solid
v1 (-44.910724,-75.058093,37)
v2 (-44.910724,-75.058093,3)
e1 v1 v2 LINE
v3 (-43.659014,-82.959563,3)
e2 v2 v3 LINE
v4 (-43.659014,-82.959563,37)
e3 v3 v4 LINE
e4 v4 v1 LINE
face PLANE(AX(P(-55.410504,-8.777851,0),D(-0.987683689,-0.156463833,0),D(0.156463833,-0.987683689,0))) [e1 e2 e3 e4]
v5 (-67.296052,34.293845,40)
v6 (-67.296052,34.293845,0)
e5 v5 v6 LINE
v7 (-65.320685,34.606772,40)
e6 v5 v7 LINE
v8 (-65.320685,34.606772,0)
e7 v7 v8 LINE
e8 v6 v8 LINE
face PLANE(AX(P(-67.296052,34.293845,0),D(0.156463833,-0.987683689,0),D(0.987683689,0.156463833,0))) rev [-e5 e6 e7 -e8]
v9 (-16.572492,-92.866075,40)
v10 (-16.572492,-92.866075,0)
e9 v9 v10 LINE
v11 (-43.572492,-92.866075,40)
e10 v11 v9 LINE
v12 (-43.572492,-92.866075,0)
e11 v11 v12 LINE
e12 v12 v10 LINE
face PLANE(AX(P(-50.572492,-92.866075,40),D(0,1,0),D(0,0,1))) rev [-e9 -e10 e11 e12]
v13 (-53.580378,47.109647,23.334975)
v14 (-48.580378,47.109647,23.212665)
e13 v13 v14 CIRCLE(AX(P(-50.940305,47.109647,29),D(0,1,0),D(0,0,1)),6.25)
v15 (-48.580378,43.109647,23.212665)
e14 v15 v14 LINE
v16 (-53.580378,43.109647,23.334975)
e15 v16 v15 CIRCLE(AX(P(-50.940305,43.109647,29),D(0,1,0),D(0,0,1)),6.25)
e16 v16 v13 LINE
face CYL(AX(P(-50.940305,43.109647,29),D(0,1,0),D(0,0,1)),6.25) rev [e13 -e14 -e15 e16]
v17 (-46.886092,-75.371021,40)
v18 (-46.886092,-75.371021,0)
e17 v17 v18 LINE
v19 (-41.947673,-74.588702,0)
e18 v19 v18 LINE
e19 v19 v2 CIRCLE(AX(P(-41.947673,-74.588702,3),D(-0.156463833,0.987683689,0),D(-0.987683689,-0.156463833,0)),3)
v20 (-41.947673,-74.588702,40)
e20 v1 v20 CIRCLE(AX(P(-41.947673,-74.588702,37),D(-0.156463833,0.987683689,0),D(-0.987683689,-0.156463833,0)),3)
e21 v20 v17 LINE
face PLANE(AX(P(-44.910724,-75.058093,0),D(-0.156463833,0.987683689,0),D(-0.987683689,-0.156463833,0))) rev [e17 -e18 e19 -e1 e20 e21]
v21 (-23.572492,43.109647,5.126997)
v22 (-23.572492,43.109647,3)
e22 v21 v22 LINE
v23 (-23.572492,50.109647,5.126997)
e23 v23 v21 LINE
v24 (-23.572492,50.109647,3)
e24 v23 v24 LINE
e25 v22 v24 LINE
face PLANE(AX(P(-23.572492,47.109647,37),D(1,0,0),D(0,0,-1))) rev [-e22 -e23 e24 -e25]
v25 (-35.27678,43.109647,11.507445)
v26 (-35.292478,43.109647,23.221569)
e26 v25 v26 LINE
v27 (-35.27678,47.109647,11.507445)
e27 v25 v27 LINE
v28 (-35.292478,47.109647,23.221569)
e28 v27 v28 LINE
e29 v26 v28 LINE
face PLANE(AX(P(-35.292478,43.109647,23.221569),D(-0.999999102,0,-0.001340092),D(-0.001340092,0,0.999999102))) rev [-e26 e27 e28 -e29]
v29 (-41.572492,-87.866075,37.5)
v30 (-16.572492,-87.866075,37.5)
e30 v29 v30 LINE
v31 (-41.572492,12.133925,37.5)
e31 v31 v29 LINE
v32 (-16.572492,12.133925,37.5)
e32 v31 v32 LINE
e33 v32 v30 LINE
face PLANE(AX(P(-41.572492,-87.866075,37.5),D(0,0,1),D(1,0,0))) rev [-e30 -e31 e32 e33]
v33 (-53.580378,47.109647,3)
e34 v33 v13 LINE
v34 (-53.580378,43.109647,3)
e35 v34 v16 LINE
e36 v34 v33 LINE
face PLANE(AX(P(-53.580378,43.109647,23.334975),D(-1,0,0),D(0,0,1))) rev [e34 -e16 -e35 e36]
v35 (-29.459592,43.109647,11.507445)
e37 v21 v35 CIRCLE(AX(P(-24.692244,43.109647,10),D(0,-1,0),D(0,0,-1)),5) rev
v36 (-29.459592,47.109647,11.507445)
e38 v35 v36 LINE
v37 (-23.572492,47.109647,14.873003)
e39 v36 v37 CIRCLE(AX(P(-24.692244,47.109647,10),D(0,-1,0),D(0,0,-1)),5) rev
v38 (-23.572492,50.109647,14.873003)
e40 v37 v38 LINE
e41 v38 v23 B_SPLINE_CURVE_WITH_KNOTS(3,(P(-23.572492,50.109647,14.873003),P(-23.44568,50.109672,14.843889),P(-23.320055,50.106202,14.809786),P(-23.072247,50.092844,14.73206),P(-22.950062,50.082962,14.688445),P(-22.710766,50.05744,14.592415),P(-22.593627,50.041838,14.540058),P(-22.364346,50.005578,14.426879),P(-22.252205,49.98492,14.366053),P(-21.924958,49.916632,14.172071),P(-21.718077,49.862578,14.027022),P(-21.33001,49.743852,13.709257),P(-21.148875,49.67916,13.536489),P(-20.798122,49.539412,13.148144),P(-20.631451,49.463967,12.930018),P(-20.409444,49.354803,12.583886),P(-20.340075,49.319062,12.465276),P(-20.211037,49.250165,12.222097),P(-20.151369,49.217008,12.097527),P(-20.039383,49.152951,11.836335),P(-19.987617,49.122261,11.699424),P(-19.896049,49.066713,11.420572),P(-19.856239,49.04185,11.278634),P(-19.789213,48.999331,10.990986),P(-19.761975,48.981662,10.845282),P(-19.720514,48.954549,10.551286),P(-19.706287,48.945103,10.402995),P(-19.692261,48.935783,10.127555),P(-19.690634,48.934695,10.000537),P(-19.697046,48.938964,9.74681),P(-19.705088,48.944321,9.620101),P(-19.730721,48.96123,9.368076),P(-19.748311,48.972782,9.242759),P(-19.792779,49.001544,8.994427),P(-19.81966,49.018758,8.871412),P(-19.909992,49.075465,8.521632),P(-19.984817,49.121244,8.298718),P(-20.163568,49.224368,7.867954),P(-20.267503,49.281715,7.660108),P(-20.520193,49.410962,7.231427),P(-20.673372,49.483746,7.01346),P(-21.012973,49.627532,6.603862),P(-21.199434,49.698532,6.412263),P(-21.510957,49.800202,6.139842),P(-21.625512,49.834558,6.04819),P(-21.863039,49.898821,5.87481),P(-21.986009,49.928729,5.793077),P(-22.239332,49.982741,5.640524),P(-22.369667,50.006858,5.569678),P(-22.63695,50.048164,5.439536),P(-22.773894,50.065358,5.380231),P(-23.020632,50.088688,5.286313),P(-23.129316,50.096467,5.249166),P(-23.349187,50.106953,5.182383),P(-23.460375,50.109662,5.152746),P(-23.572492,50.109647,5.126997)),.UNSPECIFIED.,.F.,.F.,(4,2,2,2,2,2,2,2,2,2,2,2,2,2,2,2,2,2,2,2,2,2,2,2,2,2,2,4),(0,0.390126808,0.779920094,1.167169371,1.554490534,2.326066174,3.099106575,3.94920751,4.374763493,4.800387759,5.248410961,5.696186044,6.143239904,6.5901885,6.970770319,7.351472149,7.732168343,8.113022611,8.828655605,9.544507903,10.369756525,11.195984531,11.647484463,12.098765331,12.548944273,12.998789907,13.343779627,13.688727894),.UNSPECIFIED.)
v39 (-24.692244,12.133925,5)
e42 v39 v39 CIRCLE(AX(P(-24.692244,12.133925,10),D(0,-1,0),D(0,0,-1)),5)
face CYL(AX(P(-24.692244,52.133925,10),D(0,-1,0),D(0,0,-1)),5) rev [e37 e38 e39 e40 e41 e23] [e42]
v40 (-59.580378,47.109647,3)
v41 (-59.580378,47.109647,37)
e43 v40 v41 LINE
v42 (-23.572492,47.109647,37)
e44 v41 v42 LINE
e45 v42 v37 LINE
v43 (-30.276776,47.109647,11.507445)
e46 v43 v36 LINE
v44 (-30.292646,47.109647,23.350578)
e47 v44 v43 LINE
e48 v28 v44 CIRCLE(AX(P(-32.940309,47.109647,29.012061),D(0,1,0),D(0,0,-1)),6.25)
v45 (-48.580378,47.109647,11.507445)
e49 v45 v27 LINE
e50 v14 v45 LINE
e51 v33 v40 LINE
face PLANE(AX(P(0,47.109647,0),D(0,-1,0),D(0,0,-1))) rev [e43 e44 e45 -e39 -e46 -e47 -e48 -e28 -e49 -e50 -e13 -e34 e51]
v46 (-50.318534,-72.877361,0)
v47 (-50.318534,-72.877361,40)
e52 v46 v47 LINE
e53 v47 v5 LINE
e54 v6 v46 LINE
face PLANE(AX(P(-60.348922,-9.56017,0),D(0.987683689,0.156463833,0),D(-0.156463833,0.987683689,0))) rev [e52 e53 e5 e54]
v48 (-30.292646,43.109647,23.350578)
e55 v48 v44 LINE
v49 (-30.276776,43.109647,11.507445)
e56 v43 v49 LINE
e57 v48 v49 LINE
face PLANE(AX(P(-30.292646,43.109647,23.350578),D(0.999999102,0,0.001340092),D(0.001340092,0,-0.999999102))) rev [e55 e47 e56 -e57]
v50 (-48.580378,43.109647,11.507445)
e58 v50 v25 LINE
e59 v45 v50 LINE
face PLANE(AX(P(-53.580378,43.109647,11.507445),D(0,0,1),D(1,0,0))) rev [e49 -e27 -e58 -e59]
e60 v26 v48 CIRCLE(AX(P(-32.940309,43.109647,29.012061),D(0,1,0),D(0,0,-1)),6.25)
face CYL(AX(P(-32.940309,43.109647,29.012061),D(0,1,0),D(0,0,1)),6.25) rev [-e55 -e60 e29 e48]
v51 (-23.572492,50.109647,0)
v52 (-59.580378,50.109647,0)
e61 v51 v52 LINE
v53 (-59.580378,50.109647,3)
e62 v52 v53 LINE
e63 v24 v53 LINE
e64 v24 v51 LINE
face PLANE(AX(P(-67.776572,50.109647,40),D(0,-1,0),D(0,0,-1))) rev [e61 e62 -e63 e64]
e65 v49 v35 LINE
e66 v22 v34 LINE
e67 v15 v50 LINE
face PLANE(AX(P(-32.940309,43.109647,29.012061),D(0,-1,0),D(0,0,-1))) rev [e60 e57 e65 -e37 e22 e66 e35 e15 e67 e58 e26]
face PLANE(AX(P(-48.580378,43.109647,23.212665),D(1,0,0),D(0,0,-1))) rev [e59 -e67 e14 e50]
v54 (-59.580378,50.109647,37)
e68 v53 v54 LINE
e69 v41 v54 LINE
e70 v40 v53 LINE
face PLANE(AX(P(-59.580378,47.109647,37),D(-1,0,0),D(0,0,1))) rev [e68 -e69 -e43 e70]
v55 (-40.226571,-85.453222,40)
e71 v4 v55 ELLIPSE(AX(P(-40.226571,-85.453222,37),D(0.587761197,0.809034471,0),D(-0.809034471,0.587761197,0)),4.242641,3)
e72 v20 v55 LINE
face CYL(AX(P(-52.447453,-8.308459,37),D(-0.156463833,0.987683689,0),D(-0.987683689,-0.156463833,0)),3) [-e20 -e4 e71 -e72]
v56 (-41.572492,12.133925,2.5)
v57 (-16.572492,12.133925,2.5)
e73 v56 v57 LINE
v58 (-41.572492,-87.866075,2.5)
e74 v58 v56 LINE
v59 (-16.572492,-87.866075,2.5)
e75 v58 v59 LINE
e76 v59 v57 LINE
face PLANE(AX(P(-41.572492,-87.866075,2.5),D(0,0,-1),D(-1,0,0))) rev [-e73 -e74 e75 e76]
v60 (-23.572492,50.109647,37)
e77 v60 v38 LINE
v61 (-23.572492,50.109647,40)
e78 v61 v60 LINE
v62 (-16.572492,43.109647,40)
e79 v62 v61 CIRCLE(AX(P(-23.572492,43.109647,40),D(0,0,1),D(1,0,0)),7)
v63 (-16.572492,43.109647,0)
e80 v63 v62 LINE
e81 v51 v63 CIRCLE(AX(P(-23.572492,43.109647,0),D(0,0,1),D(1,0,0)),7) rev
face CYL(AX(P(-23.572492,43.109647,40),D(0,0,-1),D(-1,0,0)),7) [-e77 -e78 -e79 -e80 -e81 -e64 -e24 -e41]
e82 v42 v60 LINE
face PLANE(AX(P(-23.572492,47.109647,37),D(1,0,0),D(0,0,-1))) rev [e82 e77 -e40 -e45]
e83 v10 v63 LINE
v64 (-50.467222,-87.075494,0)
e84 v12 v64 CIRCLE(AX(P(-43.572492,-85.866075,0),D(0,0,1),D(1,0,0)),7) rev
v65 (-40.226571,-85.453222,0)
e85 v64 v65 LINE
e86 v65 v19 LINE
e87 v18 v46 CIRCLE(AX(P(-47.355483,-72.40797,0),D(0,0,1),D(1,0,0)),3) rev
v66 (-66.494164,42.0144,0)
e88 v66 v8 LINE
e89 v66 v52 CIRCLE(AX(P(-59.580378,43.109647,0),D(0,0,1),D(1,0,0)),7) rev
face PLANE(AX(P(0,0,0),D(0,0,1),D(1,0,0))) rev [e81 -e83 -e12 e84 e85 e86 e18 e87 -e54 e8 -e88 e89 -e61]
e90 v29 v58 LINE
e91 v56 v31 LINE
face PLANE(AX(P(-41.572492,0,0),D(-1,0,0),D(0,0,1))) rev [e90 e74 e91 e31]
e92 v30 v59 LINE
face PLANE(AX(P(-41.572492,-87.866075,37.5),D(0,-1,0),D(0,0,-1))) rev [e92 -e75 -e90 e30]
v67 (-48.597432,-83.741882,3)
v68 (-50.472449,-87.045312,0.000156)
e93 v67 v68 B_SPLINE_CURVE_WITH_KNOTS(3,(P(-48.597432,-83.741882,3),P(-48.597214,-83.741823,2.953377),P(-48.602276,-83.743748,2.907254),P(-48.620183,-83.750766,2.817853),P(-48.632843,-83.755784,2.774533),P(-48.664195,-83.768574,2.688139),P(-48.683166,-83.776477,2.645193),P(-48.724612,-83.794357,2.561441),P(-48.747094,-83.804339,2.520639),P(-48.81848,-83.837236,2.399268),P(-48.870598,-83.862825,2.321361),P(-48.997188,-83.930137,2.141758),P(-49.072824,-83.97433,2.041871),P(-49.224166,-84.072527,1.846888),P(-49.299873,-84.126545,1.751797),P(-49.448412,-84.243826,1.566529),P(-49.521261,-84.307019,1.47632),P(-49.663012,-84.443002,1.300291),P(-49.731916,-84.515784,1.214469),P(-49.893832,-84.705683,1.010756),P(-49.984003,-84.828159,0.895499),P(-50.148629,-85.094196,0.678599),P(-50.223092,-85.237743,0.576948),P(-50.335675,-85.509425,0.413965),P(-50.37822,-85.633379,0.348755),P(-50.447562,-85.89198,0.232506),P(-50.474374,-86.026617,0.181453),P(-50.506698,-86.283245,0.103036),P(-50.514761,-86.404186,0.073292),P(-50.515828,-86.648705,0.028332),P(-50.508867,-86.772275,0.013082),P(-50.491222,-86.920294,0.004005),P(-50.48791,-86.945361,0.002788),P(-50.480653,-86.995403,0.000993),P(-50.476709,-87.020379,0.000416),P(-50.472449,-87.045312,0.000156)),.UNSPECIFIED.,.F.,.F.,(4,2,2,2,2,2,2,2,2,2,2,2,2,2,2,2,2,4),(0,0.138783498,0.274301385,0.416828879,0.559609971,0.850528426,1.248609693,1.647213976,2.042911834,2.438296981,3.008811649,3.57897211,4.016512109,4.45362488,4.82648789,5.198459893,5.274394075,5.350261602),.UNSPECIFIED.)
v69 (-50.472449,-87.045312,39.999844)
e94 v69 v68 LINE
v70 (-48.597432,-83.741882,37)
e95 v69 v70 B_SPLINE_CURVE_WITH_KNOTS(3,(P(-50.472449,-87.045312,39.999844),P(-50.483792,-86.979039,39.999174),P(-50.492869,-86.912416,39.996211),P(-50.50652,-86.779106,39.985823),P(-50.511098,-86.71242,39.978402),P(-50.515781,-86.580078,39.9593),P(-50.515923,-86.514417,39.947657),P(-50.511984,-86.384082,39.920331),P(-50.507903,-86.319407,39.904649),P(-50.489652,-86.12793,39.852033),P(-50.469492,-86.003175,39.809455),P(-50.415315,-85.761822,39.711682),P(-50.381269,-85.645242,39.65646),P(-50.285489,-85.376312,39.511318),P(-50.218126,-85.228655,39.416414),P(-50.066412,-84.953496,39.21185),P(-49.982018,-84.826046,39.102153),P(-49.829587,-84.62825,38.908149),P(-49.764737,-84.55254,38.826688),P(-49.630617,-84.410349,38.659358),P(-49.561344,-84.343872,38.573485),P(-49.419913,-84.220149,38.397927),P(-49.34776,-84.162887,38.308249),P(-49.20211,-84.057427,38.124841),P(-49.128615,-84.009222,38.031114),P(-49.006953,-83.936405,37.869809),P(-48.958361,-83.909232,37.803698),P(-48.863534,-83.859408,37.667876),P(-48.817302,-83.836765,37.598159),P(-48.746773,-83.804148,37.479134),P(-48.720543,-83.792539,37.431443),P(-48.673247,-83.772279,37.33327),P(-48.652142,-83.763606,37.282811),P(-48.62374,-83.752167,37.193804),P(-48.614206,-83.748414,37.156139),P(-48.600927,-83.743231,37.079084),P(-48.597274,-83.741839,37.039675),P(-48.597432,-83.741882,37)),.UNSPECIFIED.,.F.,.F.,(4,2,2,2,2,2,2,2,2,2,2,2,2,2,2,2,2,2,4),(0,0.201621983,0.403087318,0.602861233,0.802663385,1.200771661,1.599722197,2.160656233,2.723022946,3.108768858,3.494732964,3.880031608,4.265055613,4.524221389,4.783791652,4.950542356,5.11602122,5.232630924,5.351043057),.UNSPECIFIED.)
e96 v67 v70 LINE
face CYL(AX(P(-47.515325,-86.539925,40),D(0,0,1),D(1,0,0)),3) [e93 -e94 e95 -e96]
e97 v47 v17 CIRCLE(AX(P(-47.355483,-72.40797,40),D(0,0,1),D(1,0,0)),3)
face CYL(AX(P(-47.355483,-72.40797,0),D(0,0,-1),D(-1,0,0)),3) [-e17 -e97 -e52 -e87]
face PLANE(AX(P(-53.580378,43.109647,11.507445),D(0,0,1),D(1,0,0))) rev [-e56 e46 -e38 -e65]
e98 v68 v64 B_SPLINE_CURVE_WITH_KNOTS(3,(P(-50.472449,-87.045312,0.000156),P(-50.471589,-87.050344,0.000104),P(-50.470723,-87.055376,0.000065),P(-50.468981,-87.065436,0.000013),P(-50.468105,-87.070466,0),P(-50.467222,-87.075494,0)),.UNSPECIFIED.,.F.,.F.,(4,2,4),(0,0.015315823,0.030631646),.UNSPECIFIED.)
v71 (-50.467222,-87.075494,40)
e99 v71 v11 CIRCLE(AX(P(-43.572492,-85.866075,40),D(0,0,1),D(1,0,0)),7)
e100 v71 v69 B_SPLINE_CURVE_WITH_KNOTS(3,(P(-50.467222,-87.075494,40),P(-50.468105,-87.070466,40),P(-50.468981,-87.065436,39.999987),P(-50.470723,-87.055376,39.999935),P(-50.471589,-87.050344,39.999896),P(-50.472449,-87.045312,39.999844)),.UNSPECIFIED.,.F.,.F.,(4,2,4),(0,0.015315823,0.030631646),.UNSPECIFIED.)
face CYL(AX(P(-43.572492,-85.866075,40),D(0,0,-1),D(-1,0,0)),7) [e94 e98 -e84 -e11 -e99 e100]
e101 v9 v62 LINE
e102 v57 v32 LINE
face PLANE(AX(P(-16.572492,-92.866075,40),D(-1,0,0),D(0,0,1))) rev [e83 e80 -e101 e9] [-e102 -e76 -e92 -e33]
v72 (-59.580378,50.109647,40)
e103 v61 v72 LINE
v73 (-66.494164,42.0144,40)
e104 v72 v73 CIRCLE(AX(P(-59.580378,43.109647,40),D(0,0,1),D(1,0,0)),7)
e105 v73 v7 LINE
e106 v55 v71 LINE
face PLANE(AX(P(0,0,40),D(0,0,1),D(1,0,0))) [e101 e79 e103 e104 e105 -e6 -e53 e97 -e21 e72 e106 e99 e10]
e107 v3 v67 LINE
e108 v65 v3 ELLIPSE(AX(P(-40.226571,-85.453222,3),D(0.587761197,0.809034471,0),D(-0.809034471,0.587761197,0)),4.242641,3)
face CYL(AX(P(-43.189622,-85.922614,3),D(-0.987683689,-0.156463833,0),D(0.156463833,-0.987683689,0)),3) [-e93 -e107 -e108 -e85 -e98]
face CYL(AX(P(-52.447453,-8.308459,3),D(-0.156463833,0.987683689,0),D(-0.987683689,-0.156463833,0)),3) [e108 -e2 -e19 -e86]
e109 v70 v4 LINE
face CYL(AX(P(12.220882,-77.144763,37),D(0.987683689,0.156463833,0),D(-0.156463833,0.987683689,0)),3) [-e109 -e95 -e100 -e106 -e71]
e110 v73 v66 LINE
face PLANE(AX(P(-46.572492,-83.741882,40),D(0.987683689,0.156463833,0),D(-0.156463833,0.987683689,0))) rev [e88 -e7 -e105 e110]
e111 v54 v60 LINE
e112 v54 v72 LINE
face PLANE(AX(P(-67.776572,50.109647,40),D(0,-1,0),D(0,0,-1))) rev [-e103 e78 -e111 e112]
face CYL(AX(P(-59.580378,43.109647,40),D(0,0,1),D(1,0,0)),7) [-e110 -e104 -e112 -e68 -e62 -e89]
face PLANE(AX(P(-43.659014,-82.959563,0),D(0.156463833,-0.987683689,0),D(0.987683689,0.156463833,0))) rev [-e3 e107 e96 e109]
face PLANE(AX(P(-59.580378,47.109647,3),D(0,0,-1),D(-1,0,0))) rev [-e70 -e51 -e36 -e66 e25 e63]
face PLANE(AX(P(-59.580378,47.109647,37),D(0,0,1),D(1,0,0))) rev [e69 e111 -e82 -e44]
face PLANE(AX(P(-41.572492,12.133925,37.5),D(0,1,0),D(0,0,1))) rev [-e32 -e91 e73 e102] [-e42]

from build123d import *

# Parameters (mm, degrees)
BOSS_EXTRUDE1_DEPTH = 40
FILLET3_R           = 7
FILLET4_R           = 7
FILLET5_R           = 7
SKETCH8_W           = 40
SKETCH8_H           = 119.824449513
BOSS_EXTRUDE2_DEPTH = 2
SKETCH9_W           = 40
SKETCH9_H           = 8
CUT_EXTRUDE6_DEPTH  = 5
FILLET6_R           = 3
FILLET7_R           = 3
SKETCH10_W          = 35
SKETCH10_H          = 100
CUT_EXTRUDE7_DEPTH  = 25
SKETCH11_R          = 5
CUT_EXTRUDE8_DEPTH  = 40
SKETCH12_W          = 36.007885592
SKETCH12_H          = 34
CUT_EXTRUDE9_DEPTH  = 3
CUT_EXTRUDE10_DEPTH = 4
SKETCH15_W          = 30.007885592
SKETCH15_H          = 8.507444754
CUT_EXTRUDE12_DEPTH = 4


with BuildPart() as part:
    # Sketch1 → Boss-Extrude1 (new body)
    with BuildSketch(Plane.XY):
        Polygon((-46.572492334, -83.741881942), (-67.776571631, 50.109646847), (-16.572492334, 50.109646847), (-16.572492334, -92.866074504), (-50.572492334, -92.866074504), (-50.572492334, -83.741881942), align=None)
    extrude(amount=BOSS_EXTRUDE1_DEPTH)

    # Fillet3
    fillet3_edges = [part.edges().sort_by_distance(p)[0] for p in [
        (-50.572492334, -92.866074504, 20),
    ]]
    fillet(fillet3_edges, radius=FILLET3_R)

    # Fillet4
    fillet4_edges = [part.edges().sort_by_distance(p)[0] for p in [
        (-16.572492334, 50.109646847, 20),
    ]]
    fillet(fillet4_edges, radius=FILLET4_R)

    # Fillet5
    fillet5_edges = [part.edges().sort_by_distance(p)[0] for p in [
        (-67.776571631, 50.109646847, 20),
    ]]
    fillet(fillet5_edges, radius=FILLET5_R)

    # Sketch8 → Boss-Extrude2 (add)
    with BuildSketch(Plane(origin=(-58.373554794, -9.247242044, 0), x_dir=(0, 0, 1), z_dir=(-0.987683688709488, -0.15646383306444783, 0))):
        with Locations((20, -15.511355434)):
            Rectangle(SKETCH8_W, SKETCH8_H)
    extrude(amount=BOSS_EXTRUDE2_DEPTH)

    # Sketch9 → Cut-Extrude6 (cut)
    with BuildSketch(Plane(origin=(-60.348922171, -9.56016971, 0), x_dir=(0, 0, 1), z_dir=(-0.987683688709488, -0.1564638330644479, 0))):
        with Locations((20, -71.106750349)):
            Rectangle(SKETCH9_W, SKETCH9_H)
    extrude(amount=-CUT_EXTRUDE6_DEPTH, mode=Mode.SUBTRACT)

    # Fillet6
    # the kernel refuses this fillet: 3 mm, written as the material it takes off along each edge
    with BuildSketch(Plane(origin=(-50.572492334, -83.741881942, -8.262362342), x_dir=(1, 0, 0), z_dir=(0, 0, 1))) as fillet6_piece_1:
        with BuildLine():
            CenterArc((3.057167778, -2.798042747), FILLET6_R, 111.143346589, 78.555093673)
            Line((0.100043612, -3.303430385), (-0.195668805, -3.353969149))
            ThreePointArc((-0.195668805, -3.353969149), (-0.3, -2.124192562), (-0.3, 0))
            Line((-0.3, 0), (0, 0.3))
            ThreePointArc((0, 0.3), (0.987530106, 0.3), (1.866849455, 0.279804275))
            Line((1.866849455, 0.279804275), (1.975060211, 0))
        make_face()
    extrude(amount=56.524724683, mode=Mode.SUBTRACT)
    with BuildSketch(Plane(origin=(-49.849142787, -75.840412432, -7.5), x_dir=(-0.15646383306444783, 0.9876836887094879, 0), z_dir=(0, 0, 1))) as fillet6_piece_2:
        with BuildLine():
            CenterArc((FILLET6_R, -FILLET6_R), FILLET6_R, 90, 90)
            Line((0, -FILLET6_R), (-FILLET6_R * 0.02, -FILLET6_R))
            Line((-FILLET6_R * 0.02, -FILLET6_R), (-FILLET6_R * 0.02, FILLET6_R * 0.02))
            Line((-FILLET6_R * 0.02, FILLET6_R * 0.02), (FILLET6_R, FILLET6_R * 0.02))
            Line((FILLET6_R, FILLET6_R * 0.02), (FILLET6_R, 0))
        make_face()
    extrude(amount=55, mode=Mode.SUBTRACT)

    # Fillet7
    fillet7_edges = [part.edges().sort_by_distance(p)[0] for p in [
        (-44.284869011, -79.008828021, 0),
        (-44.284869011, -79.008828021, 40),
        (-46.128222901, -83.350722359, 0),
        (-46.128222901, -83.350722359, 40),
    ]]
    fillet(fillet7_edges, radius=FILLET7_R)

    # Sketch10 → Cut-Extrude7 (cut)
    with BuildSketch(Plane(origin=(-16.572492334, 0, 0), x_dir=(0, 0, -1), z_dir=(1, 0, 0))):
        with Locations((-20, -37.866074504)):
            Rectangle(SKETCH10_W, SKETCH10_H)
    extrude(amount=-CUT_EXTRUDE7_DEPTH, mode=Mode.SUBTRACT)

    # Sketch11 → Cut-Extrude8 (cut)
    with BuildSketch(Plane.XZ.offset(-12.133925496)):
        with Locations(Location((-24.692244137, 10, 0), (0, 0, 270))):
            Circle(SKETCH11_R)
    extrude(amount=-CUT_EXTRUDE8_DEPTH, mode=Mode.SUBTRACT)

    # Sketch12 → Cut-Extrude9 (cut)
    with BuildSketch(Plane(origin=(0, 50.109646847, 0), x_dir=(1, 0, 0), z_dir=(0, 1, 0))):
        with Locations((-41.57643513, -20)):
            Rectangle(SKETCH12_W, SKETCH12_H)
    extrude(amount=-CUT_EXTRUDE9_DEPTH, mode=Mode.SUBTRACT)

    # Sketch14 → Cut-Extrude10 (cut)
    with BuildSketch(Plane(origin=(0, 47.109646847, 0), x_dir=(1, 0, 0), z_dir=(0, 1, 0))):
        with BuildLine():
            Line((-48.580377926, -23.212665104), (-48.580377926, -9))
            Line((-48.580377926, -9), (-53.580377926, -9))
            Line((-53.580377926, -9), (-53.580377926, -23.334974507))
            ThreePointArc((-53.580377926, -23.334974507), (-50.787463759, -35.24813089), (-48.580377926, -23.212665104))
        make_face()
        with BuildLine():
            Line((-35.273431744, -9.008916267), (-30.273436234, -9.015616726))
            Line((-30.273436234, -9.015616726), (-30.292646413, -23.350578361))
            ThreePointArc((-30.292646413, -23.350578361), (-33.101522793, -35.259981286), (-35.292478017, -23.22156861))
            Line((-35.292478017, -23.22156861), (-35.273431744, -9.008916267))
        make_face()
    extrude(amount=-CUT_EXTRUDE10_DEPTH, mode=Mode.SUBTRACT)

    # Sketch15 → Cut-Extrude12 (cut)
    with BuildSketch(Plane(origin=(0, 47.109646847, 0), x_dir=(1, 0, 0), z_dir=(0, 1, 0))):
        with Locations((-38.57643513, -7.253722377)):
            Rectangle(SKETCH15_W, SKETCH15_H)
    extrude(amount=-CUT_EXTRUDE12_DEPTH, mode=Mode.SUBTRACT)


solid = part.part
